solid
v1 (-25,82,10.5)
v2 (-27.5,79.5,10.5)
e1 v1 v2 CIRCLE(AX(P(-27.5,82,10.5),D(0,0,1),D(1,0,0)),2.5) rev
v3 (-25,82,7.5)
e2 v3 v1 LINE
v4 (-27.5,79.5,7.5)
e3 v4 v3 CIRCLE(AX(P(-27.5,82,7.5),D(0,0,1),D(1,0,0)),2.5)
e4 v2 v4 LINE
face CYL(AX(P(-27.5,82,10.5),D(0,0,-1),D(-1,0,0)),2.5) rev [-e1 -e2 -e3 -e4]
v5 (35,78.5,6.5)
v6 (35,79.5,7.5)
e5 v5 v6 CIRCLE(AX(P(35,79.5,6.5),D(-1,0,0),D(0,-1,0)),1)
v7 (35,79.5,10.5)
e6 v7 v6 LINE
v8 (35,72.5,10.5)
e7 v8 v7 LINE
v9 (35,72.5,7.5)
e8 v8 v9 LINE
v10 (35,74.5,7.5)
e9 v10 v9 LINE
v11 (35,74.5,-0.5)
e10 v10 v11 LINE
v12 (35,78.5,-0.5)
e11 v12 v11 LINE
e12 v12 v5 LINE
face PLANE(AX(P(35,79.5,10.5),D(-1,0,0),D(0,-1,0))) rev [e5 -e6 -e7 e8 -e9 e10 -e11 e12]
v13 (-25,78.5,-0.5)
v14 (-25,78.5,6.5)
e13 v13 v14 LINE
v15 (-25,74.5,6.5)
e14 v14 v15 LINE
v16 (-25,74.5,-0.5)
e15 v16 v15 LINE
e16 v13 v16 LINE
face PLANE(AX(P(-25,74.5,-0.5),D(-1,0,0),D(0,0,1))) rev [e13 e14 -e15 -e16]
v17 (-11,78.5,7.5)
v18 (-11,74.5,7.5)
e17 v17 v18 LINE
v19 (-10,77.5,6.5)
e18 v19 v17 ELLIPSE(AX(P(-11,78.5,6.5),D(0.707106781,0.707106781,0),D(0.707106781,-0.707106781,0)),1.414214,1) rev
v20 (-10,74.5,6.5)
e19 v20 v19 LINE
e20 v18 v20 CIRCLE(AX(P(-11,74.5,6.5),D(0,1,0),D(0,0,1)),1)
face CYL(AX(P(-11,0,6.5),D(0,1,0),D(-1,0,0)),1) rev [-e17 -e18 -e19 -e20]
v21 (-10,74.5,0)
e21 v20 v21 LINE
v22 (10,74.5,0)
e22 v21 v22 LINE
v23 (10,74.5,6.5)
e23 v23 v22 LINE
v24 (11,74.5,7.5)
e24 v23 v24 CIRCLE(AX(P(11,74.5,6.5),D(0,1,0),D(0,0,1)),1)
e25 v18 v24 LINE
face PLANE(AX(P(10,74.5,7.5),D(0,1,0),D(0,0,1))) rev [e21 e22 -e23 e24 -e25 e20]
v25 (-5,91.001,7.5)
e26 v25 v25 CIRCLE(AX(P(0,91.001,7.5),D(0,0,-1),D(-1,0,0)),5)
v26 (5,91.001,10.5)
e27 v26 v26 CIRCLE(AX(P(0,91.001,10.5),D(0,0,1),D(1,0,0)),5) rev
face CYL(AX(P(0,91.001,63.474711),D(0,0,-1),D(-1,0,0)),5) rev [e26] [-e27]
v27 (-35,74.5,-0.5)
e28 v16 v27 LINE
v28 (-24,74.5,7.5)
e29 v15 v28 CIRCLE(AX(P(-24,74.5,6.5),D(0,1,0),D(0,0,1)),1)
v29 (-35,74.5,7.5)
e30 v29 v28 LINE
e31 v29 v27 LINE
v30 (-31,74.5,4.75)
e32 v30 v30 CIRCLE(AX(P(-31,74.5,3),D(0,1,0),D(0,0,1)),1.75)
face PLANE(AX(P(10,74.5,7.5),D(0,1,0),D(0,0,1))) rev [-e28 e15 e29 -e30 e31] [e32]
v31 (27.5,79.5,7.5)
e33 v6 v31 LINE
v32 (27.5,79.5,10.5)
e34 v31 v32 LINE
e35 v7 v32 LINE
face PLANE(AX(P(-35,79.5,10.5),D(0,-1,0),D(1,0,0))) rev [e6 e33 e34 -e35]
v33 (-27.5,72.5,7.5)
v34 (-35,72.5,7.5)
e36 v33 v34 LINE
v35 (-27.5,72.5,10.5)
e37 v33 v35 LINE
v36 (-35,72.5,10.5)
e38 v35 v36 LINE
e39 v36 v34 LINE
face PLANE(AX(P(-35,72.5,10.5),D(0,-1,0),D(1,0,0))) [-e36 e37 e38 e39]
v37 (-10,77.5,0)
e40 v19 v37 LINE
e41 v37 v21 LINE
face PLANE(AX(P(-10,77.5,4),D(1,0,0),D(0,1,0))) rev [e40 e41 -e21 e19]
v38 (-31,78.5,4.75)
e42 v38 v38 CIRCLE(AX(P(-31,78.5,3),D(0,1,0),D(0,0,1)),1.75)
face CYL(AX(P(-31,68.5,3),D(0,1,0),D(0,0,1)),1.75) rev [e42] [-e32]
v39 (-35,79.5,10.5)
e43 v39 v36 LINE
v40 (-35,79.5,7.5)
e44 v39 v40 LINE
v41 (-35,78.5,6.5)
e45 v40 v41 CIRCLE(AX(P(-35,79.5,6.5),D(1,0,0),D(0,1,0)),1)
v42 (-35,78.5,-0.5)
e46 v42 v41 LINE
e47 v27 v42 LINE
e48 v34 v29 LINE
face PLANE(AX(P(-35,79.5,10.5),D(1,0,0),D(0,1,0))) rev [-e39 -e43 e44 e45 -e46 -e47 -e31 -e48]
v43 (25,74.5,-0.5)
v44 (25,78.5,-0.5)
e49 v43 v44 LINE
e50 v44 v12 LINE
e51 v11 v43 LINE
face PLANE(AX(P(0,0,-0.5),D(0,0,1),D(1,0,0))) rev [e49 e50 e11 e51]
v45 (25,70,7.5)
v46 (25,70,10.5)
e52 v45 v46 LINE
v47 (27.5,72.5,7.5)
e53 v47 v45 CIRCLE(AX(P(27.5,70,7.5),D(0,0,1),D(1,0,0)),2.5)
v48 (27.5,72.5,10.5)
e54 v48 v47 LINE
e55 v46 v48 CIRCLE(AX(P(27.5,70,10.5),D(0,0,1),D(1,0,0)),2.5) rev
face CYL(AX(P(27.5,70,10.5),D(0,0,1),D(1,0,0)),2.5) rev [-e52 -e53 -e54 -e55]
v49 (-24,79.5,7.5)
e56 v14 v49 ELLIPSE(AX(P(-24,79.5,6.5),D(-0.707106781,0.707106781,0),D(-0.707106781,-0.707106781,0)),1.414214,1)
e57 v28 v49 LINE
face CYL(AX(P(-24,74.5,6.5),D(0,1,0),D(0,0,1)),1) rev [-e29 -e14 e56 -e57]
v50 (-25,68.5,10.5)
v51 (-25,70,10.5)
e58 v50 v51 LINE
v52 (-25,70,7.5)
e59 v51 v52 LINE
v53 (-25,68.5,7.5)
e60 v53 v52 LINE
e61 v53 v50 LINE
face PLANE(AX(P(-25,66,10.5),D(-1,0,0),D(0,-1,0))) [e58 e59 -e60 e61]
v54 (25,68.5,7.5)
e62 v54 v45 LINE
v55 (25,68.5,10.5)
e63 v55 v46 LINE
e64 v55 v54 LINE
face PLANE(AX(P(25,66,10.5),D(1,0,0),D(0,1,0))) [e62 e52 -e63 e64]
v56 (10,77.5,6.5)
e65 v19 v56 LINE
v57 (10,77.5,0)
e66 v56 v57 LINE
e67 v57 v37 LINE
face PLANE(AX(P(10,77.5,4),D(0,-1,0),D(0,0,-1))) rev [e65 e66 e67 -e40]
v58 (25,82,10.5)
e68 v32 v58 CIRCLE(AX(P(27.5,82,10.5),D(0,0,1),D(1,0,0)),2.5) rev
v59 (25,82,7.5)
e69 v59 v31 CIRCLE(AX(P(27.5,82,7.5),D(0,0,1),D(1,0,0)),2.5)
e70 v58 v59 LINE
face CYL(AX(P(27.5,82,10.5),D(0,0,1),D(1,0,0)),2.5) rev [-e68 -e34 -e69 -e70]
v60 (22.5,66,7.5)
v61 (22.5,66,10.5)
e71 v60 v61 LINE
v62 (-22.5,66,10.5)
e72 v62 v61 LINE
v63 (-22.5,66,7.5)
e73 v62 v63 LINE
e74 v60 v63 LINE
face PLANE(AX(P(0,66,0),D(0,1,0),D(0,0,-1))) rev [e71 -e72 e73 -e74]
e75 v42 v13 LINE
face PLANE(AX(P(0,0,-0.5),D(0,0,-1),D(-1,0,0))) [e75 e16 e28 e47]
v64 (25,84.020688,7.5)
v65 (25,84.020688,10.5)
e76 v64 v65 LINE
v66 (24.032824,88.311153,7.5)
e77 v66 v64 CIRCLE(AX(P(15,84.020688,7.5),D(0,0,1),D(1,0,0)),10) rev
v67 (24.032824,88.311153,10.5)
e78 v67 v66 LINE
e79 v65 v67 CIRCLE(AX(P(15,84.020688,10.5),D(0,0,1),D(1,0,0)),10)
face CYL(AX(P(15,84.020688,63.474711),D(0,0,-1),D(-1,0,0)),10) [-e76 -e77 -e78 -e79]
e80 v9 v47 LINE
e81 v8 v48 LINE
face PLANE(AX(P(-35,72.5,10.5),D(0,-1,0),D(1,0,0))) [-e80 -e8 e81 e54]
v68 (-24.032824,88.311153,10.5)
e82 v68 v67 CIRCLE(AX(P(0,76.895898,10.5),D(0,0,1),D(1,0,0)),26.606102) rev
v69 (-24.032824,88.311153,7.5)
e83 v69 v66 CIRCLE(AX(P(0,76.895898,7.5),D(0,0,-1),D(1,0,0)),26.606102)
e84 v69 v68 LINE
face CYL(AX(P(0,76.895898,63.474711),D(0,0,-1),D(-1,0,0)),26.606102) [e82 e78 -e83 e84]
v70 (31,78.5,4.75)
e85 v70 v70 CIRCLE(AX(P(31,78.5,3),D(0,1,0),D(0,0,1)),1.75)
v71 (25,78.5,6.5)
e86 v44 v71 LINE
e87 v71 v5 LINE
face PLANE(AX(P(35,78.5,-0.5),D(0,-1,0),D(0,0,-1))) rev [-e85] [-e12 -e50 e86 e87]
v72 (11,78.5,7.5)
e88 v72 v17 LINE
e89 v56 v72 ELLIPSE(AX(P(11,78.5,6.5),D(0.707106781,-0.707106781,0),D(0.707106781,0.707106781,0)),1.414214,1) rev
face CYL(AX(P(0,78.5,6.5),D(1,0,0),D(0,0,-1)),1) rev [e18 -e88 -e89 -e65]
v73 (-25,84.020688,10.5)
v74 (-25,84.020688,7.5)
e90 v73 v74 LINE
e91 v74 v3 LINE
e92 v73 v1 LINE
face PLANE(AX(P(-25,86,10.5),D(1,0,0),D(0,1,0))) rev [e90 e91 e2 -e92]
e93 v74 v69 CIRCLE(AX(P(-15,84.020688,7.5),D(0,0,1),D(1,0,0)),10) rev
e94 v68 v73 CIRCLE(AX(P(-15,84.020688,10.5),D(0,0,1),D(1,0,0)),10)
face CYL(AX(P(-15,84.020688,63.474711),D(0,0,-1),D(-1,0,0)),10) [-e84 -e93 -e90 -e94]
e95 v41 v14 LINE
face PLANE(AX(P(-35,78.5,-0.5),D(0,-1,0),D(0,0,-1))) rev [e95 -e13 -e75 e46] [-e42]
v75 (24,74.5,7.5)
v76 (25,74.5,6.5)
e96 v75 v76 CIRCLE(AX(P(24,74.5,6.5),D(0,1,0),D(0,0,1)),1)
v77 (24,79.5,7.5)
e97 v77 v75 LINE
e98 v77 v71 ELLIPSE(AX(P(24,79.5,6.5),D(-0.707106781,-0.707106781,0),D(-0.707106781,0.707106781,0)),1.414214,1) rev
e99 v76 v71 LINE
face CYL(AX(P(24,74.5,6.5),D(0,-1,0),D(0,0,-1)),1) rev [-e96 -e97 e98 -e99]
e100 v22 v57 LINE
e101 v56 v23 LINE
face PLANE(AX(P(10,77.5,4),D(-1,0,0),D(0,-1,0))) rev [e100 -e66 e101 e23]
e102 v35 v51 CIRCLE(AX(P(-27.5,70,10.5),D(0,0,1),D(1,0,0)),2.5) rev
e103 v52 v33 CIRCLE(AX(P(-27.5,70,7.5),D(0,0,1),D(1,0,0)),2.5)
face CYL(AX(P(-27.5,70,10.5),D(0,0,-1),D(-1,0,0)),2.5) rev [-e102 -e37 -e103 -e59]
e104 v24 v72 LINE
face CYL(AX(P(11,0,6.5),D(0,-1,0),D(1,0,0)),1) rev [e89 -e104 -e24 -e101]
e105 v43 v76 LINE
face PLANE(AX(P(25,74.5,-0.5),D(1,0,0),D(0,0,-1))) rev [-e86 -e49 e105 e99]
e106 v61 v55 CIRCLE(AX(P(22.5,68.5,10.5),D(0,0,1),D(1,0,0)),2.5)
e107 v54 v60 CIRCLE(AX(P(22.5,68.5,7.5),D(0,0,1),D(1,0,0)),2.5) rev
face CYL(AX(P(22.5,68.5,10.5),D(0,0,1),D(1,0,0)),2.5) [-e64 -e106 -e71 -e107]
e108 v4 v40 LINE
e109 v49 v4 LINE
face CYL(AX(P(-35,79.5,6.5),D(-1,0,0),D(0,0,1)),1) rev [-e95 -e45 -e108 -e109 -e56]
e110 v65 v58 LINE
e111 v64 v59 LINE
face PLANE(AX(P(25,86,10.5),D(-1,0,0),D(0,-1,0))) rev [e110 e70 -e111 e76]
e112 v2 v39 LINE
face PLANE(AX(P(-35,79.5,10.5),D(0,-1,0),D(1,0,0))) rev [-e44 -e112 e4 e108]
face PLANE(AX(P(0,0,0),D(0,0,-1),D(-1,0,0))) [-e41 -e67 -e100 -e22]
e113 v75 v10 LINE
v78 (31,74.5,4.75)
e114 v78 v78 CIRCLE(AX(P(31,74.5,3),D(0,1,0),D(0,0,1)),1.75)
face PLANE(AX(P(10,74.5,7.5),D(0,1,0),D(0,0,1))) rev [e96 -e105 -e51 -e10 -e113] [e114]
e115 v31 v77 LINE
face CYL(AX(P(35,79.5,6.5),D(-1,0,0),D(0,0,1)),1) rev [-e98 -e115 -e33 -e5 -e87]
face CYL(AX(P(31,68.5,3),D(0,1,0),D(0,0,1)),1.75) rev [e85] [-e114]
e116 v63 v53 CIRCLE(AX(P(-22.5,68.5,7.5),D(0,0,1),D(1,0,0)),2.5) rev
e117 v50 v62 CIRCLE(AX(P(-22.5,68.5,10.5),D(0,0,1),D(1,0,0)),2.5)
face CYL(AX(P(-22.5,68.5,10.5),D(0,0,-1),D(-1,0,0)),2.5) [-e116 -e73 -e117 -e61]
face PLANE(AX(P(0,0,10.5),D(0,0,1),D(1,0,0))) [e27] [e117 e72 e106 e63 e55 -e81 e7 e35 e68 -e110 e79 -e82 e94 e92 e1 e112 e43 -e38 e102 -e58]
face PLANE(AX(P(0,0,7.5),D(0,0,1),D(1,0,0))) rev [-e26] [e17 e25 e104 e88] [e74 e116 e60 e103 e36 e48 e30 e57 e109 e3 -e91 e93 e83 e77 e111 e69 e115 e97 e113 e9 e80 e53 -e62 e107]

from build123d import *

# Parameters (mm, degrees)
SKETCH1_W           = 20
SKETCH1_H           = 155
BOSS_EXTRUDE1_DEPTH = 4
SKETCH2_W           = 20
SKETCH2_H           = 4
BOSS_EXTRUDE3_DEPTH = 50
RIB2_REACH          = 96.986
SKETCH7_WALL_W      = 290.205463948
SKETCH7_WALL_H      = 4
SKETCH8_W           = 20
SKETCH8_H           = 3
BOSS_EXTRUDE4_DEPTH = 3.5
SKETCH9_W           = 70
SKETCH9_H           = 5
BOSS_EXTRUDE6_DEPTH = 3
SKETCH10_W          = 10
SKETCH10_H          = 4
BOSS_EXTRUDE7_DEPTH = 8
SKETCH12_R          = 1.75
CUT_EXTRUDE1_DEPTH  = 10
SKETCH13_W          = 111.319070758
SKETCH13_H          = 99.743885808
CUT_EXTRUDE2_DEPTH  = 152
SKETCH14_W          = 50
SKETCH14_H          = 3
BOSS_EXTRUDE8_DEPTH = 6.5
FILLET1_R           = 1
FILLET2_R           = 2.5
SKETCH15_R          = 5
BOSS_EXTRUDE9_DEPTH = 3
FILLET3_R           = 10


with BuildPart() as part:
    # Sketch1 → Boss-Extrude1 (new body)
    with BuildSketch(Plane.XY):
        Rectangle(SKETCH1_W, SKETCH1_H)
    extrude(amount=BOSS_EXTRUDE1_DEPTH)

    # Sketch2 → Boss-Extrude3 (add)
    with BuildSketch(Plane.XY.offset(4)):
        with Locations((0, -75.5)):
            Rectangle(SKETCH2_W, SKETCH2_H)
    extrude(amount=BOSS_EXTRUDE3_DEPTH)

    # Sketch7 wall → Rib2 (add, up to next)
    with BuildSketch(Plane(origin=(0, -26, 16.5), x_dir=(0, 0.967074537263, -0.25449329928), z_dir=(0, 0.25449329928, 0.967074537263)), mode=Mode.PRIVATE) as rib2_sk1:
        Rectangle(SKETCH7_WALL_W, SKETCH7_WALL_H)
    rib2_tool1 = extrude(rib2_sk1.sketch, amount=-RIB2_REACH, mode=Mode.PRIVATE) - part.part
    add(rib2_tool1.solids().sort_by_distance((0, -26, 16.5))[0])

    # Sketch8 → Boss-Extrude4 (add)
    with BuildSketch(Plane.XY.offset(4)):
        with Locations((0, 76)):
            Rectangle(SKETCH8_W, SKETCH8_H)
    extrude(amount=BOSS_EXTRUDE4_DEPTH)

    # Sketch9 → Boss-Extrude6 (add)
    with BuildSketch(Plane.XY.offset(7.5)):
        with Locations((0, 77)):
            Rectangle(SKETCH9_W, SKETCH9_H)
    boss_extrude6 = extrude(amount=BOSS_EXTRUDE6_DEPTH)

    # Sketch10 → Boss-Extrude7 (add)
    with BuildSketch(Plane(origin=(0, 0, 7.5), x_dir=(-1, 0, 0), z_dir=(0, 0, -1))):
        with Locations((30, 76.5)):
            Rectangle(SKETCH10_W, SKETCH10_H)
        with Locations((-30, 76.5)):
            Rectangle(SKETCH10_W, SKETCH10_H)
    extrude(amount=BOSS_EXTRUDE7_DEPTH)

    # Sketch12 → Cut-Extrude1 (cut)
    with BuildSketch(Plane(origin=(0, 78.5, 0), x_dir=(1, 0, 0), z_dir=(0, 1, 0))):
        with Locations(Location((-31, -3, 0), (0, 0, 270))):
            Circle(SKETCH12_R)
        with Locations(Location((31, -3, 0), (0, 0, 270))):
            Circle(SKETCH12_R)
    extrude(amount=-CUT_EXTRUDE1_DEPTH, mode=Mode.SUBTRACT)

    # Sketch13 → Cut-Extrude2 (cut)
    with BuildSketch(Plane.XZ.offset(77.5)):
        with Locations((2.652852139, 20.474703111)):
            Rectangle(SKETCH13_W, SKETCH13_H)
    extrude(amount=-CUT_EXTRUDE2_DEPTH, mode=Mode.SUBTRACT)

    # Sketch14 → Boss-Extrude8 (add)
    with BuildSketch(Plane(origin=(0, 79.5, 0), x_dir=(1, 0, 0), z_dir=(0, 1, 0))):
        with Locations((0, -9)):
            Rectangle(SKETCH14_W, SKETCH14_H)
    boss_extrude8 = extrude(amount=BOSS_EXTRUDE8_DEPTH)

    # Mirror1: Boss-Extrude6, Boss-Extrude8 across plane
    add(boss_extrude6.mirror(Plane(origin=(0, 76, 0), x_dir=(0, 0, 1), z_dir=(0, -1, 0))))
    add(boss_extrude8.mirror(Plane(origin=(0, 76, 0), x_dir=(0, 0, 1), z_dir=(0, -1, 0))))

    # Fillet1
    fillet1_edges = [part.edges().sort_by_distance(p)[0] for p in [
        (30, 78.5, 7.5),
        (-30, 78.5, 7.5),
        (10, 76, 7.5),
        (-10, 76, 7.5),
        (0, 77.5, 7.5),
        (25, 76.5, 7.5),
        (-25, 76.5, 7.5),
    ]]
    fillet(fillet1_edges, radius=FILLET1_R - 0.0001)  # a hair under: the kernel refuses the full size

    # Fillet2
    fillet2_edges = [part.edges().sort_by_distance(p)[0] for p in [
        (-25, 79.5, 9),
        (25, 79.5, 9),
        (-25, 66, 9),
        (25, 66, 9),
        (-25, 72.5, 9),
        (25, 72.5, 9),
    ]]
    fillet(fillet2_edges, radius=FILLET2_R)

    # Sketch15 → Boss-Extrude9 (add)
    with BuildSketch(Plane(origin=(0, 0, 7.5), x_dir=(-1, 0, 0), z_dir=(0, 0, -1))):
        with BuildLine():
            Line((25, 86), (-25, 86))
            ThreePointArc((-25, 86), (0, 103.502), (25, 86))
        make_face()
        with Locations((0, 91.001)):
            Circle(SKETCH15_R, mode=Mode.SUBTRACT)
    extrude(amount=-BOSS_EXTRUDE9_DEPTH)

    # Fillet3
    fillet3_edges = [part.edges().sort_by_distance(p)[0] for p in [
        (-25, 86, 9),
        (25, 86, 9),
    ]]
    fillet(fillet3_edges, radius=FILLET3_R)


solid = part.part
